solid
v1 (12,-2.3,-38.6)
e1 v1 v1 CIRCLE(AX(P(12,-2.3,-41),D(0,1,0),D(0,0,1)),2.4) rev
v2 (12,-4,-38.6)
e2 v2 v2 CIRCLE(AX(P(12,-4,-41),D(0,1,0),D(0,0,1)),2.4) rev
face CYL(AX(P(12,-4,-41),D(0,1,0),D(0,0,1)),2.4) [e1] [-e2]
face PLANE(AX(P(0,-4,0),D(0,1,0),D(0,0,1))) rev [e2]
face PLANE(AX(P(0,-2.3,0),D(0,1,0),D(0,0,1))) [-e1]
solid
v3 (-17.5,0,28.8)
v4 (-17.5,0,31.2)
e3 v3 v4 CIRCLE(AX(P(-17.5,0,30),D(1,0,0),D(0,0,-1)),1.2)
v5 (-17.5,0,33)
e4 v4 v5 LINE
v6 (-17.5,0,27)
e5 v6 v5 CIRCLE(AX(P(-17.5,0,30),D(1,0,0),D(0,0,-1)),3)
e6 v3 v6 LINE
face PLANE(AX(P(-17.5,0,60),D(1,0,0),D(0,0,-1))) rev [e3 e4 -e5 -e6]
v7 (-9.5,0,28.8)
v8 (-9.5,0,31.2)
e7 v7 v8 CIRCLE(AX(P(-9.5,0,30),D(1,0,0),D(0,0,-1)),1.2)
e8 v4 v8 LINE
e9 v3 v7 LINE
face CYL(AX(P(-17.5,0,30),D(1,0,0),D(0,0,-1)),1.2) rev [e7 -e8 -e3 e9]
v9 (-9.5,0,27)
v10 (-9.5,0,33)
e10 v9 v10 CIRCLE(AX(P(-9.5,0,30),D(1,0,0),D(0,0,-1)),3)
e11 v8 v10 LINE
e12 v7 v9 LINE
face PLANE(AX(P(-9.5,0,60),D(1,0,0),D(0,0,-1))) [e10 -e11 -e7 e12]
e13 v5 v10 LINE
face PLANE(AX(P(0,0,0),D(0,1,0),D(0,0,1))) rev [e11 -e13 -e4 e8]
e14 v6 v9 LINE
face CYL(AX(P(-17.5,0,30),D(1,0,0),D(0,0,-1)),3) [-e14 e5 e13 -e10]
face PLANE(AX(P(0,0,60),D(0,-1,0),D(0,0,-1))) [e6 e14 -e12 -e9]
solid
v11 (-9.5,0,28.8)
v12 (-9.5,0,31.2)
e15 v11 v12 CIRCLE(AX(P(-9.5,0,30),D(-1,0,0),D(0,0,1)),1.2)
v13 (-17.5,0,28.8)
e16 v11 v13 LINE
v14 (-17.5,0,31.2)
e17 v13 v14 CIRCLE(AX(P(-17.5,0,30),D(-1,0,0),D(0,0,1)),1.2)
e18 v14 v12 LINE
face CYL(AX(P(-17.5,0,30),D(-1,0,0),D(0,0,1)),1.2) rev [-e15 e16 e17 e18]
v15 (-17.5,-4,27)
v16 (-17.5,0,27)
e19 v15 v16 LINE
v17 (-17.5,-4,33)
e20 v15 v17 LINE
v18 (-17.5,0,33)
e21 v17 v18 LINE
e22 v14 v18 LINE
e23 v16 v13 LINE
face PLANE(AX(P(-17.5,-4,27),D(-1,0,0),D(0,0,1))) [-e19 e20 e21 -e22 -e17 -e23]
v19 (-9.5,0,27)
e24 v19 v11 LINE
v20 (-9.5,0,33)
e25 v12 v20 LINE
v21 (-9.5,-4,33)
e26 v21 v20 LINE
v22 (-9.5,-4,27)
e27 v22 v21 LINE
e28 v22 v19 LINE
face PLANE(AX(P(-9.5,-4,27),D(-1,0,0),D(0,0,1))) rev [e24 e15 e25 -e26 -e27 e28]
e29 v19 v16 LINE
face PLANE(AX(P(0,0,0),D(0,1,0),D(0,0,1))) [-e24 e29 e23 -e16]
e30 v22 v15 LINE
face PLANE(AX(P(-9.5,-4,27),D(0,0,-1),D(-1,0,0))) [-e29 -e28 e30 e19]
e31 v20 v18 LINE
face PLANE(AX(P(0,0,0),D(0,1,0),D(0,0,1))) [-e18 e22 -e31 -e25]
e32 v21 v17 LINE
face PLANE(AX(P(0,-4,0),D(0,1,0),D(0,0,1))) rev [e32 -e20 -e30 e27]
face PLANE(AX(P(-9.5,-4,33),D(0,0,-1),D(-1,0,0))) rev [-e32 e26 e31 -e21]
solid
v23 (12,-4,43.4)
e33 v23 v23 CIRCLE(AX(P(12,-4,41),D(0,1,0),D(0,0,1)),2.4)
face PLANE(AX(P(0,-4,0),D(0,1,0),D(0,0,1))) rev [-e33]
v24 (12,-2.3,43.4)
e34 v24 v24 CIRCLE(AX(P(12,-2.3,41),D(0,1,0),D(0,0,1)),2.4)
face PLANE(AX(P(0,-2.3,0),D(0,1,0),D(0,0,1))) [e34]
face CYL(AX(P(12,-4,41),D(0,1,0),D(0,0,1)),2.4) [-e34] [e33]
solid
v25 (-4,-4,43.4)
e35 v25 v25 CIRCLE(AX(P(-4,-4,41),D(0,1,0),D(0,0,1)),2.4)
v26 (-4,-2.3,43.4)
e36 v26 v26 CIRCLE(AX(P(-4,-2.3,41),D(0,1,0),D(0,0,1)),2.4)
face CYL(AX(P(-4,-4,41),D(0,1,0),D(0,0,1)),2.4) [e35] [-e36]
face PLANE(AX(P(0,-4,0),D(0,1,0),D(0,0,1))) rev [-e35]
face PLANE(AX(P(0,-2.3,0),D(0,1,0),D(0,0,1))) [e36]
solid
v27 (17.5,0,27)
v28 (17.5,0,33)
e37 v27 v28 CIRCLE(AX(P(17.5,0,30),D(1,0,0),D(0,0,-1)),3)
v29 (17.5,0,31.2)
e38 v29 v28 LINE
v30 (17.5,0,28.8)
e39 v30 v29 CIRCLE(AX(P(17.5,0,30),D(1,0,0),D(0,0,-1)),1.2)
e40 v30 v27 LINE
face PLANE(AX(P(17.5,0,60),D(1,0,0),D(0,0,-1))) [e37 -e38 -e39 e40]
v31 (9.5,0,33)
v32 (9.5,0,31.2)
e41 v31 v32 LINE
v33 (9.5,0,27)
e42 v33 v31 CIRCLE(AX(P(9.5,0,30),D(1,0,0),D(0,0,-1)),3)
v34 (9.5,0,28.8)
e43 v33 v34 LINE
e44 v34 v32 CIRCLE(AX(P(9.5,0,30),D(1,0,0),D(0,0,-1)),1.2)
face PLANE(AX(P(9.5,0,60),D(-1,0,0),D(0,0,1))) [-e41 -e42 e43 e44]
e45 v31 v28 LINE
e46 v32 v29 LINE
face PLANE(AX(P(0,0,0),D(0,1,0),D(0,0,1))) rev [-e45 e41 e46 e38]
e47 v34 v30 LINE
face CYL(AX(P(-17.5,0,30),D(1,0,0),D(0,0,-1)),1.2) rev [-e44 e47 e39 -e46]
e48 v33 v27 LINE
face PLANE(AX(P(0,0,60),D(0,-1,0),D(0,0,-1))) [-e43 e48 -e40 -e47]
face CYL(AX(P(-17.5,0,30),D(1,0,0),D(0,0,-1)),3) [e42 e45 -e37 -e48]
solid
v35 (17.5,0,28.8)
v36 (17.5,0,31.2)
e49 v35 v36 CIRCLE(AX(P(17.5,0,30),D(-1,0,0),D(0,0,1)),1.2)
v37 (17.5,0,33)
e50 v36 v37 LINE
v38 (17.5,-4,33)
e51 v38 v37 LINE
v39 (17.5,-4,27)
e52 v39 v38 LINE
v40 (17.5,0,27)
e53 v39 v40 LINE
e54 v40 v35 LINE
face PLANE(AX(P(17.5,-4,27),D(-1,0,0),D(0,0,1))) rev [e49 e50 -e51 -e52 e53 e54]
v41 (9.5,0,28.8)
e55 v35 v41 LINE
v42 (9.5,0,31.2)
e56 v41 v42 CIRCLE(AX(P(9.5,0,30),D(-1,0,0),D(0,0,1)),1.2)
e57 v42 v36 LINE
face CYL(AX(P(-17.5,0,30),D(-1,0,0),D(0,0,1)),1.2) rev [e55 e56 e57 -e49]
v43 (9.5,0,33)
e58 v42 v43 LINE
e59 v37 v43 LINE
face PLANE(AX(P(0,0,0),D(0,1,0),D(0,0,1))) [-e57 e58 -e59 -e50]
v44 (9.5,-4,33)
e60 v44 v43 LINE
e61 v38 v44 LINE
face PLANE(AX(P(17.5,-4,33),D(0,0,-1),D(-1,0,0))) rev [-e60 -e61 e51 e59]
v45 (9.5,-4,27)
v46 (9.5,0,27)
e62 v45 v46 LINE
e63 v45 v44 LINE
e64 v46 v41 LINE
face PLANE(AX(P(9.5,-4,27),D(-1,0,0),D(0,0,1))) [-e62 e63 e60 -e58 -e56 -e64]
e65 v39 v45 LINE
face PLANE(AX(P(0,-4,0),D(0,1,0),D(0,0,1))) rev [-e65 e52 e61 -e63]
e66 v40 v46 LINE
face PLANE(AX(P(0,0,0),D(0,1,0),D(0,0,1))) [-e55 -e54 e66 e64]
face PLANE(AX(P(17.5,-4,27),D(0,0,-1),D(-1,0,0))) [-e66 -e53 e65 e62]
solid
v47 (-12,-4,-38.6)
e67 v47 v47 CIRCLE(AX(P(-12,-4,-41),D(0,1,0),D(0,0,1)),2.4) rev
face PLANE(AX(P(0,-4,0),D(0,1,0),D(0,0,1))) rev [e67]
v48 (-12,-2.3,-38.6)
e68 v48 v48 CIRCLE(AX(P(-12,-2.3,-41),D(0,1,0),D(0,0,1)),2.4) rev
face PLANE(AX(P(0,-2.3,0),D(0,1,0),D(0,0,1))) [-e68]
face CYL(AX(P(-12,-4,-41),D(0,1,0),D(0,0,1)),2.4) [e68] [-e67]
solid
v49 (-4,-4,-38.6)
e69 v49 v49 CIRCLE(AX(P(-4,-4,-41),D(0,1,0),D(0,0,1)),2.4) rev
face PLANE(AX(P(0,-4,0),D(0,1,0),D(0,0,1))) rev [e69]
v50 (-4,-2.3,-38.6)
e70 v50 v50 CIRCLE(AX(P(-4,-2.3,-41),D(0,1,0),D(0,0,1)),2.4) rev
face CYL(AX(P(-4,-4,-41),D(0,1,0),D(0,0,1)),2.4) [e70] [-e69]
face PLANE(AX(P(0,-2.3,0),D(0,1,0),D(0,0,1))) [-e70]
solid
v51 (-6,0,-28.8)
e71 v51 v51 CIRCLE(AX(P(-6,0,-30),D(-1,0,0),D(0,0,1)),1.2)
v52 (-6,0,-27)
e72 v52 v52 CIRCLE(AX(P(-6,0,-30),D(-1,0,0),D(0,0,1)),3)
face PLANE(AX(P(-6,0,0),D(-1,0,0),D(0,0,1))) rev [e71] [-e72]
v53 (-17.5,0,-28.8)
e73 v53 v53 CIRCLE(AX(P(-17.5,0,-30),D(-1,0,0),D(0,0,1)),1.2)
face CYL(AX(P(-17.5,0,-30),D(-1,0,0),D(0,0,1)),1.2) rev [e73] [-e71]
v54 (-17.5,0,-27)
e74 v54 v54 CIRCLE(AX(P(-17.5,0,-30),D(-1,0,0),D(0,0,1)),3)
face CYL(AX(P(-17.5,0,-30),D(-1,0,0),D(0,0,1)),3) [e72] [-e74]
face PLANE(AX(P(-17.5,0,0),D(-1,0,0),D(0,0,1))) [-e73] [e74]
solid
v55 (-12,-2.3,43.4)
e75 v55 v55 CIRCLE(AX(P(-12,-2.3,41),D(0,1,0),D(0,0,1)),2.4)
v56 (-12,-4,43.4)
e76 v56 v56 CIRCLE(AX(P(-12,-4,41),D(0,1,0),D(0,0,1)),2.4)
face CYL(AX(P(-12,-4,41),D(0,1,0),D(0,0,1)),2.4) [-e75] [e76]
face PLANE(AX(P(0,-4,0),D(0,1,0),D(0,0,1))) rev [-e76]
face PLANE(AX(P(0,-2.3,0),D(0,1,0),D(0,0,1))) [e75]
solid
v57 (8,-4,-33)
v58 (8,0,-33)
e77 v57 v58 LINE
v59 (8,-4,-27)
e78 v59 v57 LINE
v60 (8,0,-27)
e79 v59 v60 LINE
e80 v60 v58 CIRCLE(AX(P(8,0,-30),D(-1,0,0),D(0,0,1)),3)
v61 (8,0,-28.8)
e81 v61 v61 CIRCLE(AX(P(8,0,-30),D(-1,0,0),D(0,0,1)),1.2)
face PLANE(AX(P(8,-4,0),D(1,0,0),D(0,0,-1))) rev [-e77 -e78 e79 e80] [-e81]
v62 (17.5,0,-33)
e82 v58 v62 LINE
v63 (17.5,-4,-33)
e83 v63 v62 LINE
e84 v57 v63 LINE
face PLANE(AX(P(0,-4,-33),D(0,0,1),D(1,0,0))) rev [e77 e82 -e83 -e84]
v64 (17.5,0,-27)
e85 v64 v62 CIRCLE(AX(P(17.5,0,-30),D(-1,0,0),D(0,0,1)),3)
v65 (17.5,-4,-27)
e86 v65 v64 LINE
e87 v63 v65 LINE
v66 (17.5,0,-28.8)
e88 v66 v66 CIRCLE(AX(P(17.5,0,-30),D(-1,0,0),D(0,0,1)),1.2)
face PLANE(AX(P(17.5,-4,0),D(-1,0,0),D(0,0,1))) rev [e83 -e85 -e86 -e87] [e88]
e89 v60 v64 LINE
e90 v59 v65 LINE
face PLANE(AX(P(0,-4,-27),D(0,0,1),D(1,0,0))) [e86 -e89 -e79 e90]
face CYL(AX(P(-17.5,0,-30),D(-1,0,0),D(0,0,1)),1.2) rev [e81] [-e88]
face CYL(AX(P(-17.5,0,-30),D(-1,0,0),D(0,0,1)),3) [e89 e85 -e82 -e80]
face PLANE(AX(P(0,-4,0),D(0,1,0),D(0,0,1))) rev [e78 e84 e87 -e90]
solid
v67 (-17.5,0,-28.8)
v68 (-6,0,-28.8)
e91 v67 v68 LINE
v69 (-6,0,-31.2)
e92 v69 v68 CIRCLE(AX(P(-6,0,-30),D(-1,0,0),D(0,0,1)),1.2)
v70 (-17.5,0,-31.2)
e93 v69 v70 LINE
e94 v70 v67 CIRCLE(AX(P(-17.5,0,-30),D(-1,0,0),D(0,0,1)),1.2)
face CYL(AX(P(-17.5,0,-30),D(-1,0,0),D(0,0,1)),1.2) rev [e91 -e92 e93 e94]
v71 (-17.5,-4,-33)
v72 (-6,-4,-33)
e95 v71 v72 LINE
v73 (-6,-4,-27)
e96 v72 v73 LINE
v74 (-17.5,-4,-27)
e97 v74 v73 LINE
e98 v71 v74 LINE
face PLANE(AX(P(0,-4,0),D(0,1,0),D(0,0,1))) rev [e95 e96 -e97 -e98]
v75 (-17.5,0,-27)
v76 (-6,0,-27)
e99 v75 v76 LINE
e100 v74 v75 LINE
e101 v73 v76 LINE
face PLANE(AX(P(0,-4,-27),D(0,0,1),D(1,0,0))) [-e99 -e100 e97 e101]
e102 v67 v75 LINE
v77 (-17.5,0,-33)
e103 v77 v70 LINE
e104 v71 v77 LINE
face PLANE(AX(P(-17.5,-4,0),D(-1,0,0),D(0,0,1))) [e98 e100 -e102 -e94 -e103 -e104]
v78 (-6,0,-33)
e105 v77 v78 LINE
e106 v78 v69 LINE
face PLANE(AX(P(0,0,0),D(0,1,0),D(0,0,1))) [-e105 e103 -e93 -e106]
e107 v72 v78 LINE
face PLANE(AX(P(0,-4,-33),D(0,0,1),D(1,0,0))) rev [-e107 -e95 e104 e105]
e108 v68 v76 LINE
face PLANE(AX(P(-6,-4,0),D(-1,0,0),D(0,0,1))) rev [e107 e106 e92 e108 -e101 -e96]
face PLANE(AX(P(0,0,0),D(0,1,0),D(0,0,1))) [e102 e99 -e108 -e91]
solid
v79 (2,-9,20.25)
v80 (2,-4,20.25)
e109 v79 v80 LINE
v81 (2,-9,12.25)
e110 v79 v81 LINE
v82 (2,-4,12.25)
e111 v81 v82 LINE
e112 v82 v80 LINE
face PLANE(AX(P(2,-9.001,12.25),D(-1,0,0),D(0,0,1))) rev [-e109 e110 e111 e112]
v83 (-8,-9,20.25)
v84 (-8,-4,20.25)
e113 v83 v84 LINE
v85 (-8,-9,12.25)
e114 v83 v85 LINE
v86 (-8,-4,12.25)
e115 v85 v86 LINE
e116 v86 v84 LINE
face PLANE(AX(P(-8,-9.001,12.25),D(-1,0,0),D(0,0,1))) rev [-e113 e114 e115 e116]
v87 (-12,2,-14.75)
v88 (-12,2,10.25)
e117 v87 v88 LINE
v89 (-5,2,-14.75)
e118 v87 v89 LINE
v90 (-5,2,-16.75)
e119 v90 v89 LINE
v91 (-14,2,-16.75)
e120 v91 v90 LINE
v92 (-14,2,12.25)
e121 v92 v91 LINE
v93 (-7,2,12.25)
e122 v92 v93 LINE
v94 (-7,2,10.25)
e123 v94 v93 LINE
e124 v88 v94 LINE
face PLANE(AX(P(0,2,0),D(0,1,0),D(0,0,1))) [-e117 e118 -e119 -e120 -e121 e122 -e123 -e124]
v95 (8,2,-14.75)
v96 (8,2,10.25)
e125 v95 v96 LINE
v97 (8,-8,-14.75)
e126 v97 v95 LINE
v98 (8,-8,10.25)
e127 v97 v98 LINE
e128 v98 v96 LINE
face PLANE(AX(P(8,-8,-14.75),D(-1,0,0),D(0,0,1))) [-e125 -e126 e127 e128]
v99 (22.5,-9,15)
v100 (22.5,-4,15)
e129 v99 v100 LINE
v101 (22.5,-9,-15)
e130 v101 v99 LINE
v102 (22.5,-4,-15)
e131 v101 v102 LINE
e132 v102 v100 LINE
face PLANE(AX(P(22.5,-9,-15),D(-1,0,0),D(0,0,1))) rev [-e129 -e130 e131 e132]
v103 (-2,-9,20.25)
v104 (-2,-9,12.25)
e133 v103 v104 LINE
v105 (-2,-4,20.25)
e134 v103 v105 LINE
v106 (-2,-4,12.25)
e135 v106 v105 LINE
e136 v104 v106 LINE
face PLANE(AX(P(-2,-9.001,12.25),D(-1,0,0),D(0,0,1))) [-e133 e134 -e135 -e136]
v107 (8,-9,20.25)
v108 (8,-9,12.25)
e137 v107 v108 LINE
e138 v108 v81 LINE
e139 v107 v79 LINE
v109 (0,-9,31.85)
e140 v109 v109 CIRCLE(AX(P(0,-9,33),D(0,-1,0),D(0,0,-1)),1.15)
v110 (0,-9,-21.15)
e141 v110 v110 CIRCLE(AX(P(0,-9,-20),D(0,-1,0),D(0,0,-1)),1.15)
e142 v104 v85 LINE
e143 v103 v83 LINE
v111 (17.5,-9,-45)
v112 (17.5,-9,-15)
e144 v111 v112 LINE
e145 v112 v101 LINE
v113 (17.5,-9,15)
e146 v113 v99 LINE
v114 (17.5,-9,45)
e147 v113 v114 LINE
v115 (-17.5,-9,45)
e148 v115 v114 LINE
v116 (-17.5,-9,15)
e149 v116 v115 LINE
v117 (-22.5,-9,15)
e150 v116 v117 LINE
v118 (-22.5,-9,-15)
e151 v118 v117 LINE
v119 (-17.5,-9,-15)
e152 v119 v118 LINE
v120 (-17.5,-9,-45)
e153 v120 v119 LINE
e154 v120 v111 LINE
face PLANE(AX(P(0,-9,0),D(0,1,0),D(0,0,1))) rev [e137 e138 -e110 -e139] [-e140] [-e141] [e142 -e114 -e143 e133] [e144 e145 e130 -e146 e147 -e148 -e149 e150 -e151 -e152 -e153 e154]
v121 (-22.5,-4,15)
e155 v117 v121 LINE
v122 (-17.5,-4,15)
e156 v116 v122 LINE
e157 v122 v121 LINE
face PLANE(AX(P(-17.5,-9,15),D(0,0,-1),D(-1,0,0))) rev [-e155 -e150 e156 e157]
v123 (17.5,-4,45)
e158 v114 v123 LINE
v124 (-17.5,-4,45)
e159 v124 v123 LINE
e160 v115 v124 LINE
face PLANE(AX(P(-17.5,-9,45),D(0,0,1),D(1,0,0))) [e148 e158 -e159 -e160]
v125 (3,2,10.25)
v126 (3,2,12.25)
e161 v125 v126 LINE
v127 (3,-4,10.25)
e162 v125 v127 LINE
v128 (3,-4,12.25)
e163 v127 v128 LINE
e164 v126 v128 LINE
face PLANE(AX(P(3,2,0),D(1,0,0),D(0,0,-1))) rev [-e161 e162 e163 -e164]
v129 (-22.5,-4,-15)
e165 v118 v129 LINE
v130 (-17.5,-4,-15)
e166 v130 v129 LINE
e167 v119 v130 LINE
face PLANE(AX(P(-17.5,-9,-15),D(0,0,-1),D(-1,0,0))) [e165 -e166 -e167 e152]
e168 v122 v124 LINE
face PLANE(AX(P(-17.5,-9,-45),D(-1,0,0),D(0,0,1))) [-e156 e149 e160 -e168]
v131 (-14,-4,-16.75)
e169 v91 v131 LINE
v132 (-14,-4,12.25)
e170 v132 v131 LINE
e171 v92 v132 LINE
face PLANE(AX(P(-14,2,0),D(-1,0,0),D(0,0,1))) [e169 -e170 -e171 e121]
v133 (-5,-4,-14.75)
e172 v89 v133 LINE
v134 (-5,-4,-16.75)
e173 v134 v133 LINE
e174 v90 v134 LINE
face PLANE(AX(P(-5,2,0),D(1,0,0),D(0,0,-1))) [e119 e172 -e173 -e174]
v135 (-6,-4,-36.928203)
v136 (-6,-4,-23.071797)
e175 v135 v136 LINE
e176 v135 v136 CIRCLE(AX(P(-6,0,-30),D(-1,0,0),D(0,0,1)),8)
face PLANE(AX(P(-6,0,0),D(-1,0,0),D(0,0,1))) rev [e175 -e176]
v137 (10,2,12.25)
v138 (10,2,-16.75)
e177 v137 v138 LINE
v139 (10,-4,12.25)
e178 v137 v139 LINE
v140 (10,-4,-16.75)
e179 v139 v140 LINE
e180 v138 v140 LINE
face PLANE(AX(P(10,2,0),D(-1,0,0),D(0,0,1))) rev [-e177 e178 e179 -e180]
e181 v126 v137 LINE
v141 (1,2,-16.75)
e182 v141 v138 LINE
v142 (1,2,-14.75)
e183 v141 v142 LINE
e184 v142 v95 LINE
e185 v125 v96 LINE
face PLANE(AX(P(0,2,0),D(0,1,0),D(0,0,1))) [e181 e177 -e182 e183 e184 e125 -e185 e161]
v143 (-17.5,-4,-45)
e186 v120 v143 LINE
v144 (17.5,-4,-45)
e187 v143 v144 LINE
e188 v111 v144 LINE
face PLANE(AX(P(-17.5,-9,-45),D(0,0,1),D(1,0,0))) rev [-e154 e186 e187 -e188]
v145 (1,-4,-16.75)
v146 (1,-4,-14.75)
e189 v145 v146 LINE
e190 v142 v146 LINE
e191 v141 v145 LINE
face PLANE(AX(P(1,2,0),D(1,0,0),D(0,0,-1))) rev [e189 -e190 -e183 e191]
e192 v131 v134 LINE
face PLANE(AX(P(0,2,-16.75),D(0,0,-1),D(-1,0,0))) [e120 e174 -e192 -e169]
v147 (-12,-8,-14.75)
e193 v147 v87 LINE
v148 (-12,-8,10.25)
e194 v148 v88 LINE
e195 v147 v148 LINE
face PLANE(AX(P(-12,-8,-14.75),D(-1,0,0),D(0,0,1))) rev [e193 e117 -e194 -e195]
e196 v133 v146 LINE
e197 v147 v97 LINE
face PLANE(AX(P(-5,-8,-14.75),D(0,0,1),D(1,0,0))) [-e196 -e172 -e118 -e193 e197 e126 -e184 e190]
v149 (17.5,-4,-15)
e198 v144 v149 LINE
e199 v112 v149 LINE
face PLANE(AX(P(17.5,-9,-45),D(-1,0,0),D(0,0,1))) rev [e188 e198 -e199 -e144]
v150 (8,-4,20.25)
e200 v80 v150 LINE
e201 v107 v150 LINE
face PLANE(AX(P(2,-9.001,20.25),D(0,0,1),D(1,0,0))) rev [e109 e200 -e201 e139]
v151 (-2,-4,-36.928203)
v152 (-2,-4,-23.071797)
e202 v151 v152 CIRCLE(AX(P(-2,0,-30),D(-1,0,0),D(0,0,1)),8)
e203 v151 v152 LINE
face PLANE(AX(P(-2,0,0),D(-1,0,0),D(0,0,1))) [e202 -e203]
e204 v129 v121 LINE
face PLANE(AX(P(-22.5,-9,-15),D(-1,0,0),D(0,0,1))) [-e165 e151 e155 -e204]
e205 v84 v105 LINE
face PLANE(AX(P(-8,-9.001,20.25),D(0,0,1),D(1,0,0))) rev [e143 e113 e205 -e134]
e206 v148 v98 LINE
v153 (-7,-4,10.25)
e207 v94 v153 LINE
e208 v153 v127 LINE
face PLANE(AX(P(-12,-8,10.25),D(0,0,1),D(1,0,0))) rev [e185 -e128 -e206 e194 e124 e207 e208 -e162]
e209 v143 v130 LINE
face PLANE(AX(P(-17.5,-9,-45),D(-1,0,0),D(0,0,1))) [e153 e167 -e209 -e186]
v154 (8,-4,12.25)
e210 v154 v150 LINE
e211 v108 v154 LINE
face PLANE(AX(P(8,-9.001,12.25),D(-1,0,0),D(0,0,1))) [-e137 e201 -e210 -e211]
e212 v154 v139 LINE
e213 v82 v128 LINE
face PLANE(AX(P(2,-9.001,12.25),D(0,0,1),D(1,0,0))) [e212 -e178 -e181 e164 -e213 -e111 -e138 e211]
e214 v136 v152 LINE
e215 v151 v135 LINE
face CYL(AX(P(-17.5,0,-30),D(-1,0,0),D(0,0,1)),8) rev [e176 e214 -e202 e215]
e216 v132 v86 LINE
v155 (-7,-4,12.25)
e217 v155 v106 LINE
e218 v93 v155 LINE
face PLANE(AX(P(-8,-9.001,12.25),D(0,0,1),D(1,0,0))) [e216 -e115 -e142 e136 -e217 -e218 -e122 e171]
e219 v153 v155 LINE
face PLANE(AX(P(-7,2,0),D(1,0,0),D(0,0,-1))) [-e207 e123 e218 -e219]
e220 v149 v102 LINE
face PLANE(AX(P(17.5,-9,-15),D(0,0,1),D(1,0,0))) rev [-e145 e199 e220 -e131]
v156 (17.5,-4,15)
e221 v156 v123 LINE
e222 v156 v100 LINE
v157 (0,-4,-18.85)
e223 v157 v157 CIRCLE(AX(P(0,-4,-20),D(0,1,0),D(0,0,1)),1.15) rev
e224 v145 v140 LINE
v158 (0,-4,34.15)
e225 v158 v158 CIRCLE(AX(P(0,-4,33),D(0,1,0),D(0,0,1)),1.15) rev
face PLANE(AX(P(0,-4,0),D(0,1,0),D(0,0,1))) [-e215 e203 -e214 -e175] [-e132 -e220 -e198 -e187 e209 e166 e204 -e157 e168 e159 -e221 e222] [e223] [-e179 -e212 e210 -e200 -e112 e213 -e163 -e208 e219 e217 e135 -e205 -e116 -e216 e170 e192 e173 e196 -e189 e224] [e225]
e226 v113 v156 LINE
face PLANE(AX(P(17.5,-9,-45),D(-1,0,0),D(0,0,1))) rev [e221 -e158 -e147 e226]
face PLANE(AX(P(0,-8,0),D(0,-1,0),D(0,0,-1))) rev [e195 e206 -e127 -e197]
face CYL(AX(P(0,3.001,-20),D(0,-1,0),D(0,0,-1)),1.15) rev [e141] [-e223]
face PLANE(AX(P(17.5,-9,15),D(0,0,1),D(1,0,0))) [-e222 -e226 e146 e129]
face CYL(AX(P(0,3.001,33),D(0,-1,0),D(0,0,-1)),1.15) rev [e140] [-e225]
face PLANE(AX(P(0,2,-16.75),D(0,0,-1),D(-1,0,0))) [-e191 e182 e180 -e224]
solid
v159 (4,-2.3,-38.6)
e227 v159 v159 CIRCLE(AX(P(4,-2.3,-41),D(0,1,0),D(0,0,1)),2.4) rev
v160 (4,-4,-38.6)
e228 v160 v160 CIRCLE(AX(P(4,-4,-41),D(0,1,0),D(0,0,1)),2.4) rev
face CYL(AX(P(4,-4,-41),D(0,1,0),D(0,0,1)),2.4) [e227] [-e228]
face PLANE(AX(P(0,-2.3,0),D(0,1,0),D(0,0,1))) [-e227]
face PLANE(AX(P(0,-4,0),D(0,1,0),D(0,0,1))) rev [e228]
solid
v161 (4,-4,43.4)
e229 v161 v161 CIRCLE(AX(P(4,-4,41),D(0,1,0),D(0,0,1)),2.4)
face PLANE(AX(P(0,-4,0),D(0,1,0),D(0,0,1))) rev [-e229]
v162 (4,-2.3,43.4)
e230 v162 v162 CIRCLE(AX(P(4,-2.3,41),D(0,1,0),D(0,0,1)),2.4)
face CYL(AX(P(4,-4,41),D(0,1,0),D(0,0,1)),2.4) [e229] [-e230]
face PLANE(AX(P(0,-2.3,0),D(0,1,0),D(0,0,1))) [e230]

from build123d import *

# Parameters (mm, degrees)
SKETCH1_W             = 9.5
SKETCH1_H             = 1.8
SKETCH1_H_2           = 1.2
SKETCH1_H_3           = 3
SKETCH1_W_2           = 11.5
SKETCH1_W_3           = 8
SKETCH1_H_4           = 6
BOSS_EXTRUDE1_DEPTH   = 4
SKETCH1_3_W           = 8
SKETCH1_3_H           = 1.8
REVOLVE1_ANGLE        = 180
REVOLVE2_START        = -17.5
REVOLVE2_OUTLINE_R    = 3
REVOLVE2_OUTLINE_R_2  = 1.2
REVOLVE2_DEPTH        = 11.5
REVOLVE2_START_2      = 8
REVOLVE2_2_DEPTH      = 9.5
SKETCH1_6_W           = 11.5
SKETCH1_6_H           = 1.2
SKETCH1_6_W_2         = 9.5
BOSS_EXTRUDE2_START   = -4
SKETCH1_7_W           = 35
SKETCH1_7_H           = 90
SKETCH1_7_W_2         = 5
SKETCH1_7_H_2         = 30
BOSS_EXTRUDE2_DEPTH   = 5
SKETCH1_9_W           = 8
SKETCH1_9_H           = 1.2
SKETCH1_10_W          = 4
SKETCH1_10_H          = 3
SKETCH1_10_W_2        = 10
SKETCH1_10_H_2        = 1
CUT_EXTRUDE2_DEPTH    = 4
SKETCH9_R             = 1.15
CUT_EXTRUDE4_DEPTH    = 5
SKETCH10_W            = 6
SKETCH10_H            = 8
CUT_EXTRUDE5_DEPTH    = 5
BOSS_EXTRUDE3_DEPTH   = 6
BOSS_EXTRUDE4_START   = -2.3
SKETCH1_12_R          = 2.4
BOSS_EXTRUDE4_DEPTH   = 1.7
BOSS_EXTRUDE4_2_DEPTH = 1.7
BOSS_EXTRUDE4_3_DEPTH = 1.7
BOSS_EXTRUDE4_4_DEPTH = 1.7
BOSS_EXTRUDE4_5_DEPTH = 1.7
BOSS_EXTRUDE4_6_DEPTH = 1.7
BOSS_EXTRUDE4_7_DEPTH = 1.7
BOSS_EXTRUDE4_8_DEPTH = 1.7


# Read off the part's stored shape, not the designer's step: Revolve2
with BuildPart() as part:
    # Sketch1 → Boss-Extrude1 (new body)
    with BuildSketch(Plane(origin=(0, 0, 0), x_dir=(1, 0, 0), z_dir=(0, 1, 0))):
        with Locations((12.75, 27.9)):
            Rectangle(SKETCH1_W, SKETCH1_H)
        with Locations((12.75, 29.4)):
            Rectangle(SKETCH1_W, SKETCH1_H_2)
        with Locations((12.75, 31.5)):
            Rectangle(SKETCH1_W, SKETCH1_H_3)
        with Locations((-11.75, 27.9)):
            Rectangle(SKETCH1_W_2, SKETCH1_H)
        with Locations((-11.75, 29.4)):
            Rectangle(SKETCH1_W_2, SKETCH1_H_2)
        with Locations((-11.75, 31.5)):
            Rectangle(SKETCH1_W_2, SKETCH1_H_3)
        with Locations((13.5, -30)):
            Rectangle(SKETCH1_W_3, SKETCH1_H_4)
        with Locations((-13.5, -30)):
            Rectangle(SKETCH1_W_3, SKETCH1_H_4)
    extrude(amount=-BOSS_EXTRUDE1_DEPTH)

    # Revolve2 2 outline → Revolve2 2 (add)
    with BuildSketch(Plane.YZ.offset(REVOLVE2_START_2)):
        with BuildLine():
            Line((0, -27), (0, -28.8))
            ThreePointArc((0, -28.8), (1.2, -30), (0, -31.2))
            Line((0, -31.2), (0, -33))
            ThreePointArc((0, -33), (3, -30), (0, -27))
        make_face()
    extrude(amount=REVOLVE2_2_DEPTH)

    # Sketch1<6> → Cut-Revolve2 (revolve, cut)
    with BuildSketch(Plane(origin=(0, 0, 0), x_dir=(1, 0, 0), z_dir=(0, 1, 0))):
        with Locations((-11.75, 29.4)):
            Rectangle(SKETCH1_6_W, SKETCH1_6_H)
        with Locations((12.75, 29.4)):
            Rectangle(SKETCH1_6_W_2, SKETCH1_6_H)
        Polygon((-2, 30), (-6, 30), (-6, 28.8), (8, 28.8), (8, 30), align=None)
    revolve(axis=Axis((-17.5, 0, -30), (1, 0, 0)), mode=Mode.SUBTRACT)

    # Sketch1<9> → Cut-Revolve7 (revolve, cut)
    with BuildSketch(Plane(origin=(0, 0, 0), x_dir=(1, 0, 0), z_dir=(0, 1, 0))):
        with Locations((-13.5, -30.6)):
            Rectangle(SKETCH1_9_W, SKETCH1_9_H)
        with Locations((13.5, -30.6)):
            Rectangle(SKETCH1_9_W, SKETCH1_9_H)
    revolve(axis=Axis((-17.5, 0, 30), (1, 0, 0)), mode=Mode.SUBTRACT)


with BuildPart() as body_2:
    # Sketch1<3> → Revolve1 (revolve)
    with BuildSketch(Plane(origin=(0, 0, 0), x_dir=(1, 0, 0), z_dir=(0, 1, 0))):
        with Locations((-13.5, -32.1)):
            Rectangle(SKETCH1_3_W, SKETCH1_3_H)
        with Locations((13.5, -32.1)):
            Rectangle(SKETCH1_3_W, SKETCH1_3_H)
    revolve(axis=Axis((-17.5, 0, 30), (-1, 0, 0)), revolution_arc=REVOLVE1_ANGLE)


with BuildPart() as body_3:
    # Revolve2 outline → Revolve2 (new body)
    with BuildSketch(Plane.YZ.offset(REVOLVE2_START)):
        with Locations((0, -30)):
            Circle(REVOLVE2_OUTLINE_R)
        with Locations((0, -30)):
            Circle(REVOLVE2_OUTLINE_R_2, mode=Mode.SUBTRACT)
    extrude(amount=REVOLVE2_DEPTH)


with BuildPart() as body_4:
    # Sketch1<7> → Boss-Extrude2 (new body)
    with BuildSketch(Plane(origin=(0, 0, 0), x_dir=(1, 0, 0), z_dir=(0, 1, 0)).offset(BOSS_EXTRUDE2_START)):
        Rectangle(SKETCH1_7_W, SKETCH1_7_H)
        with Locations((-20, 0)):
            Rectangle(SKETCH1_7_W_2, SKETCH1_7_H_2)
        with Locations((20, 0)):
            Rectangle(SKETCH1_7_W_2, SKETCH1_7_H_2)
    extrude(amount=-BOSS_EXTRUDE2_DEPTH)

    # Sketch1<10> → Cut-Revolve8 (revolve, cut)
    with BuildSketch(Plane(origin=(0, 0, 0), x_dir=(1, 0, 0), z_dir=(0, 1, 0)), mode=Mode.PRIVATE) as cut_revolve8_sk:
        Polygon((-6, 38), (-6, 33), (-2, 33), (-2, 34), (-2, 38), align=None)
        with Locations((-4, 31.5)):
            Rectangle(SKETCH1_10_W, SKETCH1_10_H)
        with Locations((3, 33.5)):
            Rectangle(SKETCH1_10_W_2, SKETCH1_10_H_2)
        with Locations((3, 31.5)):
            Rectangle(SKETCH1_10_W_2, SKETCH1_10_H)
    revolve(cut_revolve8_sk.sketch.rotate(Axis((-17.5, 0, -30), (1, 0, 0)), 180), axis=Axis((-17.5, 0, -30), (1, 0, 0)), mode=Mode.SUBTRACT)

    # Sketch4 → Cut-Extrude2 (cut)
    with BuildSketch(Plane(origin=(0, -4, 0), x_dir=(1, 0, 0), z_dir=(0, 1, 0))):
        Polygon((-12, 14.75), (-5, 14.75), (8, 14.75), (8, -10.25), (-12, -10.25), align=None)
    extrude(amount=-CUT_EXTRUDE2_DEPTH, mode=Mode.SUBTRACT)

    # Sketch9 → Cut-Extrude4 (cut)
    with BuildSketch(Plane.XZ.offset(9)):
        with Locations(Location((0, 33, 0), (0, 0, 270))):
            Circle(SKETCH9_R)
        with Locations(Location((0, -20, 0), (0, 0, 270))):
            Circle(SKETCH9_R)
    extrude(amount=-CUT_EXTRUDE4_DEPTH, mode=Mode.SUBTRACT)

    # Sketch10 → Cut-Extrude5 (cut)
    with BuildSketch(Plane(origin=(0, -4, 0), x_dir=(1, 0, 0), z_dir=(0, 1, 0))):
        with Locations((-5, -16.25)):
            Rectangle(SKETCH10_W, SKETCH10_H)
        with Locations((5, -16.25)):
            Rectangle(SKETCH10_W, SKETCH10_H)
    extrude(amount=-CUT_EXTRUDE5_DEPTH, mode=Mode.SUBTRACT)

    # Sketch4<6> → Boss-Extrude3 (add)
    with BuildSketch(Plane(origin=(0, -4, 0), x_dir=(1, 0, 0), z_dir=(0, 1, 0))):
        Polygon((-12, -10.25), (-12, 14.75), (-5, 14.75), (-5, 16.75), (-14, 16.75), (-14, -12.25), (-7, -12.25), (-7, -10.25), align=None)
        Polygon((1, 16.75), (1, 14.75), (8, 14.75), (8, -10.25), (3, -10.25), (3, -12.25), (10, -12.25), (10, 16.75), align=None)
    extrude(amount=BOSS_EXTRUDE3_DEPTH)


with BuildPart() as body_5:
    # Sketch1<12> → Boss-Extrude4 (new body)
    with BuildSketch(Plane(origin=(0, 0, 0), x_dir=(1, 0, 0), z_dir=(0, 1, 0)).offset(BOSS_EXTRUDE4_START)):
        with Locations(Location((-4, 41, 0), (0, 0, 270))):
            Circle(SKETCH1_12_R)
    extrude(amount=-BOSS_EXTRUDE4_DEPTH)


with BuildPart() as body_6:
    # Sketch1<12> → Boss-Extrude4 2 (new body)
    with BuildSketch(Plane(origin=(0, 0, 0), x_dir=(1, 0, 0), z_dir=(0, 1, 0)).offset(BOSS_EXTRUDE4_START)):
        with Locations(Location((4, 41, 0), (0, 0, 270))):
            Circle(SKETCH1_12_R)
    extrude(amount=-BOSS_EXTRUDE4_2_DEPTH)


with BuildPart() as body_7:
    # Sketch1<12> → Boss-Extrude4 3 (new body)
    with BuildSketch(Plane(origin=(0, 0, 0), x_dir=(1, 0, 0), z_dir=(0, 1, 0)).offset(BOSS_EXTRUDE4_START)):
        with Locations(Location((-12, 41, 0), (0, 0, 270))):
            Circle(SKETCH1_12_R)
    extrude(amount=-BOSS_EXTRUDE4_3_DEPTH)


with BuildPart() as body_8:
    # Sketch1<12> → Boss-Extrude4 4 (new body)
    with BuildSketch(Plane(origin=(0, 0, 0), x_dir=(1, 0, 0), z_dir=(0, 1, 0)).offset(BOSS_EXTRUDE4_START)):
        with Locations(Location((12, 41, 0), (0, 0, 270))):
            Circle(SKETCH1_12_R)
    extrude(amount=-BOSS_EXTRUDE4_4_DEPTH)


with BuildPart() as body_9:
    # Sketch1<12> → Boss-Extrude4 5 (new body)
    with BuildSketch(Plane(origin=(0, 0, 0), x_dir=(1, 0, 0), z_dir=(0, 1, 0)).offset(BOSS_EXTRUDE4_START)):
        with Locations(Location((12, -41, 0), (0, 0, 270))):
            Circle(SKETCH1_12_R)
    extrude(amount=-BOSS_EXTRUDE4_5_DEPTH)


with BuildPart() as body_10:
    # Sketch1<12> → Boss-Extrude4 6 (new body)
    with BuildSketch(Plane(origin=(0, 0, 0), x_dir=(1, 0, 0), z_dir=(0, 1, 0)).offset(BOSS_EXTRUDE4_START)):
        with Locations(Location((4, -41, 0), (0, 0, 270))):
            Circle(SKETCH1_12_R)
    extrude(amount=-BOSS_EXTRUDE4_6_DEPTH)


with BuildPart() as body_11:
    # Sketch1<12> → Boss-Extrude4 7 (new body)
    with BuildSketch(Plane(origin=(0, 0, 0), x_dir=(1, 0, 0), z_dir=(0, 1, 0)).offset(BOSS_EXTRUDE4_START)):
        with Locations(Location((-4, -41, 0), (0, 0, 270))):
            Circle(SKETCH1_12_R)
    extrude(amount=-BOSS_EXTRUDE4_7_DEPTH)


with BuildPart() as body_12:
    # Sketch1<12> → Boss-Extrude4 8 (new body)
    with BuildSketch(Plane(origin=(0, 0, 0), x_dir=(1, 0, 0), z_dir=(0, 1, 0)).offset(BOSS_EXTRUDE4_START)):
        with Locations(Location((-12, -41, 0), (0, 0, 270))):
            Circle(SKETCH1_12_R)
    extrude(amount=-BOSS_EXTRUDE4_8_DEPTH)


solid = Compound([part.part, body_2.part, body_3.part, body_4.part, body_5.part, body_6.part, body_7.part, body_8.part, body_9.part, body_10.part, body_11.part, body_12.part])
